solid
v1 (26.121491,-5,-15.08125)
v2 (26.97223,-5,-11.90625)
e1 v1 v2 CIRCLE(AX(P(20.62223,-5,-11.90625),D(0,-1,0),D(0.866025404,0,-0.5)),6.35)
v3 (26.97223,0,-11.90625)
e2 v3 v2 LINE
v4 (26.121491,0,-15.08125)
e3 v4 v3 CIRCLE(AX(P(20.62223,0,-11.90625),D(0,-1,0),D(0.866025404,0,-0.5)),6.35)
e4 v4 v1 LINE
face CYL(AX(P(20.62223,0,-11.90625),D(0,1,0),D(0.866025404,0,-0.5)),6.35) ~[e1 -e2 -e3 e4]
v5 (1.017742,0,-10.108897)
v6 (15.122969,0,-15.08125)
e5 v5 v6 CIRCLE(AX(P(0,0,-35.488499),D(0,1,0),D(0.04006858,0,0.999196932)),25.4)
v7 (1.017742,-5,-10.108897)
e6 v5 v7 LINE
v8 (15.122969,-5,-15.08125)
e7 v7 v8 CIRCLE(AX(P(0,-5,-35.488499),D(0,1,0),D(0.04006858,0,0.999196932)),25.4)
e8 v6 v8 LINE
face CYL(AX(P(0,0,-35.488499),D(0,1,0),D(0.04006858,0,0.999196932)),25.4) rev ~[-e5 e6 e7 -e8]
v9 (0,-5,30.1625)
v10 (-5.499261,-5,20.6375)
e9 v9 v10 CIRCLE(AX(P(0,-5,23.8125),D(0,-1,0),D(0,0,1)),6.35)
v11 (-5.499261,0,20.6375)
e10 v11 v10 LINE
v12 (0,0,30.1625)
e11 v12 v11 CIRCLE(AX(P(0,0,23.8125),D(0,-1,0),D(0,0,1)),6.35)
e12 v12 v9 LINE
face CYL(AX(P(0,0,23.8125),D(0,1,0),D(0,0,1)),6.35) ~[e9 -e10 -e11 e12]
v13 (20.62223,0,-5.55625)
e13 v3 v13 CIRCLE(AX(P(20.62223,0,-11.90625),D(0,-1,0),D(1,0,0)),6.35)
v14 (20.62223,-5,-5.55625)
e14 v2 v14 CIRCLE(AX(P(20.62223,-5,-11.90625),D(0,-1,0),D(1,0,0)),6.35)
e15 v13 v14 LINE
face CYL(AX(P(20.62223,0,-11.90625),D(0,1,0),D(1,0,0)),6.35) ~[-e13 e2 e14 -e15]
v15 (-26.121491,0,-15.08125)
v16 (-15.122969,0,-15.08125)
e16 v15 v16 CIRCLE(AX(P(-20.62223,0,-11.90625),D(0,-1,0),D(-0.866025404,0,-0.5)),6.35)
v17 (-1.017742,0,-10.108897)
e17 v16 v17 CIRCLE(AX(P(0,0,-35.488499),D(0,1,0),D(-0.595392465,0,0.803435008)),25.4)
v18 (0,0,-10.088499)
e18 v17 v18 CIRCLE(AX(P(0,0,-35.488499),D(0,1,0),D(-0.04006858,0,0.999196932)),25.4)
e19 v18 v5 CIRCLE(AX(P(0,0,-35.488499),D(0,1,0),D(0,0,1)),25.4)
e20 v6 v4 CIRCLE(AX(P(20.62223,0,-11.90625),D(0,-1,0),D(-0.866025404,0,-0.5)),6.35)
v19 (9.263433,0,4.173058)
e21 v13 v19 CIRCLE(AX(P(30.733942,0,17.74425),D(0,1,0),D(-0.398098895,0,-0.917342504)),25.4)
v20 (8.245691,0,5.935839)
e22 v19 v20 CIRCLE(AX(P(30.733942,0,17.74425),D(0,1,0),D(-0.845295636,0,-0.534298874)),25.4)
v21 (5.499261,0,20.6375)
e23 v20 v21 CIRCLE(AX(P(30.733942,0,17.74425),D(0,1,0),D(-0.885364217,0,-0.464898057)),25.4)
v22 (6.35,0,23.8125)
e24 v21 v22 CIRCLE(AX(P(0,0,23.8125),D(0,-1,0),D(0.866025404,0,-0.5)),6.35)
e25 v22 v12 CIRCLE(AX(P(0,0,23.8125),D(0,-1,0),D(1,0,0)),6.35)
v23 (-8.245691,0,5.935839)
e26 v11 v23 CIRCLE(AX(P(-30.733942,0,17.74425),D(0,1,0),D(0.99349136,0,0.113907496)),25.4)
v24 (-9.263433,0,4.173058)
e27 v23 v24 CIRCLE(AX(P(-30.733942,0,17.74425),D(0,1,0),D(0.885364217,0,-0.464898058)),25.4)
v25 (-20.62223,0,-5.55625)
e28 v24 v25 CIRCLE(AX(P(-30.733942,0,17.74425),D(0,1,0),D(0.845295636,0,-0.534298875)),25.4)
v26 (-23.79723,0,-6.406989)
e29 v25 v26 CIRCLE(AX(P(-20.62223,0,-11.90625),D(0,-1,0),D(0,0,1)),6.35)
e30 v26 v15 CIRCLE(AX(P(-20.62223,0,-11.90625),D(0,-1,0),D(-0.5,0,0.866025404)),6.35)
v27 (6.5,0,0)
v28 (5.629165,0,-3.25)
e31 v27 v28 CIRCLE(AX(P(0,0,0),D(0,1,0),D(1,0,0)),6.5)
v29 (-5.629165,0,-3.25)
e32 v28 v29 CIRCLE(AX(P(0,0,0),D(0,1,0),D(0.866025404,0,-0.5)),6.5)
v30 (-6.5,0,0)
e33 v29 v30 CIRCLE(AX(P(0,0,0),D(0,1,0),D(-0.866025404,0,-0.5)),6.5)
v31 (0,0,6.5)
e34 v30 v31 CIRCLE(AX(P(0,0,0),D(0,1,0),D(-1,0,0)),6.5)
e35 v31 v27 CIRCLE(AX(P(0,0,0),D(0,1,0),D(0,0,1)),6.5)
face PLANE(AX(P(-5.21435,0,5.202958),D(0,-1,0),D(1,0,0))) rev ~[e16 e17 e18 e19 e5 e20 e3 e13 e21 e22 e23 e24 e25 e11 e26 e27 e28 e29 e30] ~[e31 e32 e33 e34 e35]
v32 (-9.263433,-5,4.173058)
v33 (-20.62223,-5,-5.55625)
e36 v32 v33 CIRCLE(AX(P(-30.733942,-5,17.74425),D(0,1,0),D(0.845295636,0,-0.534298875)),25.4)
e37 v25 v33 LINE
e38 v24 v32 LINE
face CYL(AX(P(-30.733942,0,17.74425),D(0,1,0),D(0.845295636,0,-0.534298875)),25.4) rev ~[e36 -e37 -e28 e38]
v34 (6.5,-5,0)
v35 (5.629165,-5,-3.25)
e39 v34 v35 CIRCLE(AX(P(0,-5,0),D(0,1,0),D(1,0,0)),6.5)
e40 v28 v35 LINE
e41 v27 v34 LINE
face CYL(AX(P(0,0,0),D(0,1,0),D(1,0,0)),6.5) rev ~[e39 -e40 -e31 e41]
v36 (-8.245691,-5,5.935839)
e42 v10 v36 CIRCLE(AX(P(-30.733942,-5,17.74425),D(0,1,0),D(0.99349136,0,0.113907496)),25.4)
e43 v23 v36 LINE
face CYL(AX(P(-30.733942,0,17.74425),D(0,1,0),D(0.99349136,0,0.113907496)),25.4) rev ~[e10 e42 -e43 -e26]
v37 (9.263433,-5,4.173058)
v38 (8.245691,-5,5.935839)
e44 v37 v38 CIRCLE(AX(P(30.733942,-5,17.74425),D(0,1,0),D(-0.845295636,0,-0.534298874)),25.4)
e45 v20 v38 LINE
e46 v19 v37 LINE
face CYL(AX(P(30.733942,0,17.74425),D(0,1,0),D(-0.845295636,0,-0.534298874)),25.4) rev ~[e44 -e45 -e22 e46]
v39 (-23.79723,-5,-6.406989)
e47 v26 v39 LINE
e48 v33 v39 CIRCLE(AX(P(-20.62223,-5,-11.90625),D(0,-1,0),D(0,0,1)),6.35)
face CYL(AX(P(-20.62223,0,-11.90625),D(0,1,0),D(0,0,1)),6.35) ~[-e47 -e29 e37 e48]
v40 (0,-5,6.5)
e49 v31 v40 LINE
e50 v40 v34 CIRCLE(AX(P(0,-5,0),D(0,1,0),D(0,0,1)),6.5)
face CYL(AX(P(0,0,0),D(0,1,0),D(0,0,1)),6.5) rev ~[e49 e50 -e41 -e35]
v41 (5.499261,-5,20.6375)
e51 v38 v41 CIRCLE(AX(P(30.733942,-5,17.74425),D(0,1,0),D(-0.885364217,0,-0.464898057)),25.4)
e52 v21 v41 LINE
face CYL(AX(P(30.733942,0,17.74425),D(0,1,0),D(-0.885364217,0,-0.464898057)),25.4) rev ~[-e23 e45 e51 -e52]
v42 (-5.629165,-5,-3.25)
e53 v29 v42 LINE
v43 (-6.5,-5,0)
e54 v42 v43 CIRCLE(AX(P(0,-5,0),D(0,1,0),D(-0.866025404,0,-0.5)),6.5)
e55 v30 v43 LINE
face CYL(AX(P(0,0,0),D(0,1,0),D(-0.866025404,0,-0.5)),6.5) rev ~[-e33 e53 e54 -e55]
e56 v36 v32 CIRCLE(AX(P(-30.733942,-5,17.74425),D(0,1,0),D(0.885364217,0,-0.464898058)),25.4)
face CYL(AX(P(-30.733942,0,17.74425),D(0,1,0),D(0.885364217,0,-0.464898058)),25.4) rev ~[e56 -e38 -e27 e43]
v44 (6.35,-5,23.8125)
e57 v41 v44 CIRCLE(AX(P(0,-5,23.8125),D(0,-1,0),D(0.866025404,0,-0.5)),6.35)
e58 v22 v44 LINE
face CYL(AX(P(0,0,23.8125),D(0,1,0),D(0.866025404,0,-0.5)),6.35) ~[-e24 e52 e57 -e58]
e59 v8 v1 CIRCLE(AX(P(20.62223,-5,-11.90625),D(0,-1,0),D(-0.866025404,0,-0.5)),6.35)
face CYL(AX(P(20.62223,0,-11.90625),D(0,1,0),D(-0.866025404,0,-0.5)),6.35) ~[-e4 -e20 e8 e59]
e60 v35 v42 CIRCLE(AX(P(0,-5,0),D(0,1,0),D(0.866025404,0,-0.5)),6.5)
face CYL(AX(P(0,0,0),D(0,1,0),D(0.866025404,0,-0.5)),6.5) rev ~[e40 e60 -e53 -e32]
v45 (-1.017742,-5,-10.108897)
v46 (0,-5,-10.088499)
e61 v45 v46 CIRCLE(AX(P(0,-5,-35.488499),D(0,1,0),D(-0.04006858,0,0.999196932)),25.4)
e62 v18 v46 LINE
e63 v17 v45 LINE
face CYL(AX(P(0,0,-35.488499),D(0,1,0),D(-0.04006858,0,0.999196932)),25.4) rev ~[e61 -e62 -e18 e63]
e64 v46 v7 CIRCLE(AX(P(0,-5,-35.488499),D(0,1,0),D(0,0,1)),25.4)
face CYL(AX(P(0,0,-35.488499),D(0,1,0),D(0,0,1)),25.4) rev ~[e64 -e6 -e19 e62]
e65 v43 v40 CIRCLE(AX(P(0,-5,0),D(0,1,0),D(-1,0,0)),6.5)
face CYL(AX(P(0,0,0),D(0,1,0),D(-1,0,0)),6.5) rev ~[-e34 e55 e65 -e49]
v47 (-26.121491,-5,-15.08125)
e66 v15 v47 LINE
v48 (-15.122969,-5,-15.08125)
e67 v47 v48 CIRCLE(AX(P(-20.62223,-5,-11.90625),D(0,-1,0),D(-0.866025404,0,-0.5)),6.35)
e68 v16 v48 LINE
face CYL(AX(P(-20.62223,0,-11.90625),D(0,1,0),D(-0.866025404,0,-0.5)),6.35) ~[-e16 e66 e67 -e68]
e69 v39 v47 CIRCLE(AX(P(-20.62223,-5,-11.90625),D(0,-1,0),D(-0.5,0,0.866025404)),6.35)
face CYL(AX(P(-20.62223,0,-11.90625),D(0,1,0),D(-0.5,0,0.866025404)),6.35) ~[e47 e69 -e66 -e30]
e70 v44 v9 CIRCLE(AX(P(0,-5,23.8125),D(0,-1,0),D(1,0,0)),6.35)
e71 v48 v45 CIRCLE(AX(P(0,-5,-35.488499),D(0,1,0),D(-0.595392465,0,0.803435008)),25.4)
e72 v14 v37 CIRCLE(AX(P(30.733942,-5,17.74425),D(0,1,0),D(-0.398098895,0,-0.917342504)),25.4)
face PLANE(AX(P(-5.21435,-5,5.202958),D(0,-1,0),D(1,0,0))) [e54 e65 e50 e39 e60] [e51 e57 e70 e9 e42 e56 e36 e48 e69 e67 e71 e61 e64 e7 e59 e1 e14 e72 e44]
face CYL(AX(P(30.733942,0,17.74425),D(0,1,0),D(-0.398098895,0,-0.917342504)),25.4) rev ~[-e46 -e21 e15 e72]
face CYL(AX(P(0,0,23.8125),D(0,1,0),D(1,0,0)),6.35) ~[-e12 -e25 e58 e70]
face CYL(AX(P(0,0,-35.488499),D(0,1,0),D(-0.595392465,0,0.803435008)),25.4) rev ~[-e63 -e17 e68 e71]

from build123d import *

# Parameters (mm, degrees)
F1_DEPTH = 5


# Not quite as in the source:
# - a feature names something its author has since deleted; it is built from what else it names


with BuildPart() as f1:
    # F0 (on Front) → F1 (new body)
    with BuildSketch(Plane.XZ):
        with BuildLine():
            ThreePointArc((-6.5, 0), (-4.5961940777, 4.5961940777), (0, 6.5))
            Line((0, 6.5), (0, 10.16))
            ThreePointArc((0, 10.16), (-4.6323577324, 9.0425030738), (-8.2456907547, 5.9358389447))
            ThreePointArc((-8.2456907547, 5.9358389447), (-8.7368966018, 5.0442496049), (-9.2634326962, 4.173058193))
            ThreePointArc((-9.2634326962, 4.173058193), (-9.9333296581, 2.1341419594), (-10.16, 0))
            Line((-10.16, 0), (-6.5, 0))
        make_face()
        with BuildLine():
            ThreePointArc((-5.6291651246, -3.25), (-6.2785178709, -1.6823237932), (-6.5, 0))
            Line((-6.5, 0), (-10.16, 0))
            ThreePointArc((-10.16, 0), (-9.8138063951, -2.6296014982), (-8.7988181024, -5.08))
            Line((-8.7988181024, -5.08), (-5.6291651246, -3.25))
        make_face()
        with BuildLine():
            ThreePointArc((-1.0177419415, -10.1088971377), (-0.508973166, -10.0935992038), (0, -10.0884992098))
            Line((0, -10.0884992098), (0, -6.5))
            ThreePointArc((0, -6.5), (-3.25, -5.6291651246), (-5.6291651246, -3.25))
            Line((-5.6291651246, -3.25), (-8.7988181024, -5.08))
            ThreePointArc((-8.7988181024, -5.08), (-5.5148585095, -8.5329910126), (-1.0177419415, -10.1088971377))
        make_face()
        with BuildLine():
            ThreePointArc((1.0177419415, -10.1088971377), (5.5148585095, -8.5329910126), (8.7988181024, -5.08))
            Line((8.7988181024, -5.08), (5.6291651246, -3.25))
            ThreePointArc((5.6291651246, -3.25), (3.25, -5.6291651246), (0, -6.5))
            Line((0, -6.5), (0, -10.0884992098))
            ThreePointArc((0, -10.0884992098), (0.508973166, -10.0935992038), (1.0177419415, -10.1088971377))
        make_face()
        with BuildLine():
            ThreePointArc((8.7988181024, -5.08), (9.8138063951, -2.6296014982), (10.16, 0))
            Line((10.16, 0), (6.5, 0))
            ThreePointArc((6.5, 0), (6.2785178709, -1.6823237932), (5.6291651246, -3.25))
            Line((5.6291651246, -3.25), (8.7988181024, -5.08))
        make_face()
        with BuildLine():
            Line((6.5, 0), (10.16, 0))
            ThreePointArc((10.16, 0), (9.9333296581, 2.1341419594), (9.2634326962, 4.173058193))
            ThreePointArc((9.2634326962, 4.173058193), (8.7368966018, 5.0442496049), (8.2456907547, 5.9358389447))
            ThreePointArc((8.2456907547, 5.9358389447), (4.6323577324, 9.0425030738), (0, 10.16))
            Line((0, 10.16), (0, 6.5))
            ThreePointArc((0, 6.5), (4.5961940777, 4.5961940777), (6.5, 0))
        make_face()
        with BuildLine():
            ThreePointArc((-8.2456907547, 5.9358389447), (-4.6323577324, 9.0425030738), (0, 10.16))
            Line((0, 10.16), (0, 15.875))
            Line((0, 15.875), (0, 17.4625))
            ThreePointArc((0, 17.4625), (-3.175, 18.313238686), (-5.499261314, 20.6375))
            ThreePointArc((-5.499261314, 20.6375), (-5.7658770412, 13.0799448007), (-8.2456907547, 5.9358389447))
        make_face()
        with BuildLine():
            Line((-5.499261314, 20.6375), (0, 23.8125))
            Line((0, 23.8125), (0, 30.1625))
            ThreePointArc((0, 30.1625), (-5.499261314, 26.9875), (-5.499261314, 20.6375))
        make_face()
        with BuildLine():
            Line((0, 23.8125), (5.499261314, 20.6375))
            ThreePointArc((5.499261314, 20.6375), (6.1336289969, 22.1689990636), (6.35, 23.8125))
            ThreePointArc((6.35, 23.8125), (4.4901280605, 28.3026280605), (0, 30.1625))
            Line((0, 30.1625), (0, 23.8125))
        make_face()
        with BuildLine():
            ThreePointArc((0, 17.4625), (3.175, 18.313238686), (5.499261314, 20.6375))
            Line((5.499261314, 20.6375), (0, 23.8125))
            Line((0, 23.8125), (0, 17.4625))
        make_face()
        with BuildLine():
            ThreePointArc((-5.499261314, 20.6375), (-3.175, 18.313238686), (0, 17.4625))
            Line((0, 17.4625), (0, 23.8125))
            Line((0, 23.8125), (-5.499261314, 20.6375))
        make_face()
        with BuildLine():
            Line((-20.6222299276, -5.55625), (-20.6222299276, -11.90625))
            Line((-20.6222299276, -11.90625), (-15.1229686136, -8.73125))
            ThreePointArc((-15.1229686136, -8.73125), (-17.4472299276, -6.406988686), (-20.6222299276, -5.55625))
        make_face()
        with BuildLine():
            Line((-23.7972299276, -6.406988686), (-20.6222299276, -11.90625))
            Line((-20.6222299276, -11.90625), (-20.6222299276, -5.55625))
            ThreePointArc((-20.6222299276, -5.55625), (-22.265730864, -5.7726210031), (-23.7972299276, -6.406988686))
        make_face()
        with BuildLine():
            ThreePointArc((-23.7972299276, -6.406988686), (-26.7558589246, -10.2627490636), (-26.1214912416, -15.08125))
            Line((-26.1214912416, -15.08125), (-20.6222299276, -11.90625))
            Line((-20.6222299276, -11.90625), (-23.7972299276, -6.406988686))
        make_face()
        with BuildLine():
            ThreePointArc((-26.1214912416, -15.08125), (-20.6222299276, -18.25625), (-15.1229686136, -15.08125))
            Line((-15.1229686136, -15.08125), (-20.6222299276, -11.90625))
            Line((-20.6222299276, -11.90625), (-26.1214912416, -15.08125))
        make_face()
        with BuildLine():
            Line((-20.6222299276, -11.90625), (-15.1229686136, -15.08125))
            ThreePointArc((-15.1229686136, -15.08125), (-14.4886009307, -13.5497509364), (-14.2722299276, -11.90625))
            ThreePointArc((-14.2722299276, -11.90625), (-14.4886009307, -10.2627490636), (-15.1229686136, -8.73125))
            Line((-15.1229686136, -8.73125), (-20.6222299276, -11.90625))
        make_face()
        with BuildLine():
            Line((20.6222299276, -11.90625), (15.1229686136, -15.08125))
            ThreePointArc((15.1229686136, -15.08125), (20.6222299276, -18.25625), (26.1214912416, -15.08125))
            Line((26.1214912416, -15.08125), (20.6222299276, -11.90625))
        make_face()
        with BuildLine():
            ThreePointArc((26.9722299276, -11.90625), (25.1123579882, -7.4161219395), (20.6222299276, -5.55625))
            Line((20.6222299276, -5.55625), (20.6222299276, -11.90625))
            Line((20.6222299276, -11.90625), (26.1214912416, -15.08125))
            ThreePointArc((26.1214912416, -15.08125), (26.7558589246, -13.5497509364), (26.9722299276, -11.90625))
        make_face()
        with BuildLine():
            Line((20.6222299276, -11.90625), (20.6222299276, -5.55625))
            ThreePointArc((20.6222299276, -5.55625), (17.4472299276, -6.406988686), (15.1229686136, -8.73125))
            Line((15.1229686136, -8.73125), (20.6222299276, -11.90625))
        make_face()
        with BuildLine():
            ThreePointArc((15.1229686136, -8.73125), (14.2722299276, -11.90625), (15.1229686136, -15.08125))
            Line((15.1229686136, -15.08125), (20.6222299276, -11.90625))
            Line((20.6222299276, -11.90625), (15.1229686136, -8.73125))
        make_face()
        with BuildLine():
            ThreePointArc((-15.1229686136, -15.08125), (-8.4446259569, -11.5333683931), (-1.0177419415, -10.1088971377))
            ThreePointArc((-1.0177419415, -10.1088971377), (-5.5148585095, -8.5329910126), (-8.7988181024, -5.08))
            Line((-8.7988181024, -5.08), (-13.7481532851, -7.9375))
            Line((-13.7481532851, -7.9375), (-15.1229686136, -8.73125))
            ThreePointArc((-15.1229686136, -8.73125), (-14.4886009307, -10.2627490636), (-14.2722299276, -11.90625))
            ThreePointArc((-14.2722299276, -11.90625), (-14.4886009307, -13.5497509364), (-15.1229686136, -15.08125))
        make_face()
        with BuildLine():
            ThreePointArc((0, 10.16), (4.6323577324, 9.0425030738), (8.2456907547, 5.9358389447))
            ThreePointArc((8.2456907547, 5.9358389447), (5.7658770412, 13.0799448007), (5.499261314, 20.6375))
            ThreePointArc((5.499261314, 20.6375), (3.175, 18.313238686), (0, 17.4625))
            Line((0, 17.4625), (0, 15.875))
            Line((0, 15.875), (0, 10.16))
        make_face()
        with BuildLine():
            Line((12.5597401985, 0), (10.16, 0))
            ThreePointArc((10.16, 0), (9.8138063951, -2.6296014982), (8.7988181024, -5.08))
            Line((8.7988181024, -5.08), (13.7481532851, -7.9375))
            Line((13.7481532851, -7.9375), (15.1229686136, -8.73125))
            ThreePointArc((15.1229686136, -8.73125), (17.4472299276, -6.406988686), (20.6222299276, -5.55625))
            ThreePointArc((20.6222299276, -5.55625), (16.3207116364, -3.1703097876), (12.5597401985, 0))
        make_face()
        with BuildLine():
            ThreePointArc((-8.7988181024, -5.08), (-9.8138063951, -2.6296014982), (-10.16, 0))
            Line((-10.16, 0), (-12.5597401985, 0))
            ThreePointArc((-12.5597401985, 0), (-16.3207116364, -3.1703097876), (-20.6222299276, -5.55625))
            ThreePointArc((-20.6222299276, -5.55625), (-17.4472299276, -6.406988686), (-15.1229686136, -8.73125))
            Line((-15.1229686136, -8.73125), (-13.7481532851, -7.9375))
            Line((-13.7481532851, -7.9375), (-8.7988181024, -5.08))
        make_face()
        with BuildLine():
            Line((13.7481532851, -7.9375), (8.7988181024, -5.08))
            ThreePointArc((8.7988181024, -5.08), (5.5148585095, -8.5329910126), (1.0177419415, -10.1088971377))
            ThreePointArc((1.0177419415, -10.1088971377), (8.4446259569, -11.5333683931), (15.1229686136, -15.08125))
            ThreePointArc((15.1229686136, -15.08125), (14.2722299276, -11.90625), (15.1229686136, -8.73125))
            Line((15.1229686136, -8.73125), (13.7481532851, -7.9375))
        make_face()
        with BuildLine():
            Line((-12.5597401985, 0), (-10.16, 0))
            ThreePointArc((-10.16, 0), (-9.9333296581, 2.1341419594), (-9.2634326962, 4.173058193))
            ThreePointArc((-9.2634326962, 4.173058193), (-10.8020734635, 2.0000245587), (-12.5597401985, 0))
        make_face()
        with BuildLine():
            ThreePointArc((9.2634326962, 4.173058193), (9.9333296581, 2.1341419594), (10.16, 0))
            Line((10.16, 0), (12.5597401985, 0))
            ThreePointArc((12.5597401985, 0), (10.8020734635, 2.0000245587), (9.2634326962, 4.173058193))
        make_face()
    extrude(amount=F1_DEPTH)


solid = f1.part
